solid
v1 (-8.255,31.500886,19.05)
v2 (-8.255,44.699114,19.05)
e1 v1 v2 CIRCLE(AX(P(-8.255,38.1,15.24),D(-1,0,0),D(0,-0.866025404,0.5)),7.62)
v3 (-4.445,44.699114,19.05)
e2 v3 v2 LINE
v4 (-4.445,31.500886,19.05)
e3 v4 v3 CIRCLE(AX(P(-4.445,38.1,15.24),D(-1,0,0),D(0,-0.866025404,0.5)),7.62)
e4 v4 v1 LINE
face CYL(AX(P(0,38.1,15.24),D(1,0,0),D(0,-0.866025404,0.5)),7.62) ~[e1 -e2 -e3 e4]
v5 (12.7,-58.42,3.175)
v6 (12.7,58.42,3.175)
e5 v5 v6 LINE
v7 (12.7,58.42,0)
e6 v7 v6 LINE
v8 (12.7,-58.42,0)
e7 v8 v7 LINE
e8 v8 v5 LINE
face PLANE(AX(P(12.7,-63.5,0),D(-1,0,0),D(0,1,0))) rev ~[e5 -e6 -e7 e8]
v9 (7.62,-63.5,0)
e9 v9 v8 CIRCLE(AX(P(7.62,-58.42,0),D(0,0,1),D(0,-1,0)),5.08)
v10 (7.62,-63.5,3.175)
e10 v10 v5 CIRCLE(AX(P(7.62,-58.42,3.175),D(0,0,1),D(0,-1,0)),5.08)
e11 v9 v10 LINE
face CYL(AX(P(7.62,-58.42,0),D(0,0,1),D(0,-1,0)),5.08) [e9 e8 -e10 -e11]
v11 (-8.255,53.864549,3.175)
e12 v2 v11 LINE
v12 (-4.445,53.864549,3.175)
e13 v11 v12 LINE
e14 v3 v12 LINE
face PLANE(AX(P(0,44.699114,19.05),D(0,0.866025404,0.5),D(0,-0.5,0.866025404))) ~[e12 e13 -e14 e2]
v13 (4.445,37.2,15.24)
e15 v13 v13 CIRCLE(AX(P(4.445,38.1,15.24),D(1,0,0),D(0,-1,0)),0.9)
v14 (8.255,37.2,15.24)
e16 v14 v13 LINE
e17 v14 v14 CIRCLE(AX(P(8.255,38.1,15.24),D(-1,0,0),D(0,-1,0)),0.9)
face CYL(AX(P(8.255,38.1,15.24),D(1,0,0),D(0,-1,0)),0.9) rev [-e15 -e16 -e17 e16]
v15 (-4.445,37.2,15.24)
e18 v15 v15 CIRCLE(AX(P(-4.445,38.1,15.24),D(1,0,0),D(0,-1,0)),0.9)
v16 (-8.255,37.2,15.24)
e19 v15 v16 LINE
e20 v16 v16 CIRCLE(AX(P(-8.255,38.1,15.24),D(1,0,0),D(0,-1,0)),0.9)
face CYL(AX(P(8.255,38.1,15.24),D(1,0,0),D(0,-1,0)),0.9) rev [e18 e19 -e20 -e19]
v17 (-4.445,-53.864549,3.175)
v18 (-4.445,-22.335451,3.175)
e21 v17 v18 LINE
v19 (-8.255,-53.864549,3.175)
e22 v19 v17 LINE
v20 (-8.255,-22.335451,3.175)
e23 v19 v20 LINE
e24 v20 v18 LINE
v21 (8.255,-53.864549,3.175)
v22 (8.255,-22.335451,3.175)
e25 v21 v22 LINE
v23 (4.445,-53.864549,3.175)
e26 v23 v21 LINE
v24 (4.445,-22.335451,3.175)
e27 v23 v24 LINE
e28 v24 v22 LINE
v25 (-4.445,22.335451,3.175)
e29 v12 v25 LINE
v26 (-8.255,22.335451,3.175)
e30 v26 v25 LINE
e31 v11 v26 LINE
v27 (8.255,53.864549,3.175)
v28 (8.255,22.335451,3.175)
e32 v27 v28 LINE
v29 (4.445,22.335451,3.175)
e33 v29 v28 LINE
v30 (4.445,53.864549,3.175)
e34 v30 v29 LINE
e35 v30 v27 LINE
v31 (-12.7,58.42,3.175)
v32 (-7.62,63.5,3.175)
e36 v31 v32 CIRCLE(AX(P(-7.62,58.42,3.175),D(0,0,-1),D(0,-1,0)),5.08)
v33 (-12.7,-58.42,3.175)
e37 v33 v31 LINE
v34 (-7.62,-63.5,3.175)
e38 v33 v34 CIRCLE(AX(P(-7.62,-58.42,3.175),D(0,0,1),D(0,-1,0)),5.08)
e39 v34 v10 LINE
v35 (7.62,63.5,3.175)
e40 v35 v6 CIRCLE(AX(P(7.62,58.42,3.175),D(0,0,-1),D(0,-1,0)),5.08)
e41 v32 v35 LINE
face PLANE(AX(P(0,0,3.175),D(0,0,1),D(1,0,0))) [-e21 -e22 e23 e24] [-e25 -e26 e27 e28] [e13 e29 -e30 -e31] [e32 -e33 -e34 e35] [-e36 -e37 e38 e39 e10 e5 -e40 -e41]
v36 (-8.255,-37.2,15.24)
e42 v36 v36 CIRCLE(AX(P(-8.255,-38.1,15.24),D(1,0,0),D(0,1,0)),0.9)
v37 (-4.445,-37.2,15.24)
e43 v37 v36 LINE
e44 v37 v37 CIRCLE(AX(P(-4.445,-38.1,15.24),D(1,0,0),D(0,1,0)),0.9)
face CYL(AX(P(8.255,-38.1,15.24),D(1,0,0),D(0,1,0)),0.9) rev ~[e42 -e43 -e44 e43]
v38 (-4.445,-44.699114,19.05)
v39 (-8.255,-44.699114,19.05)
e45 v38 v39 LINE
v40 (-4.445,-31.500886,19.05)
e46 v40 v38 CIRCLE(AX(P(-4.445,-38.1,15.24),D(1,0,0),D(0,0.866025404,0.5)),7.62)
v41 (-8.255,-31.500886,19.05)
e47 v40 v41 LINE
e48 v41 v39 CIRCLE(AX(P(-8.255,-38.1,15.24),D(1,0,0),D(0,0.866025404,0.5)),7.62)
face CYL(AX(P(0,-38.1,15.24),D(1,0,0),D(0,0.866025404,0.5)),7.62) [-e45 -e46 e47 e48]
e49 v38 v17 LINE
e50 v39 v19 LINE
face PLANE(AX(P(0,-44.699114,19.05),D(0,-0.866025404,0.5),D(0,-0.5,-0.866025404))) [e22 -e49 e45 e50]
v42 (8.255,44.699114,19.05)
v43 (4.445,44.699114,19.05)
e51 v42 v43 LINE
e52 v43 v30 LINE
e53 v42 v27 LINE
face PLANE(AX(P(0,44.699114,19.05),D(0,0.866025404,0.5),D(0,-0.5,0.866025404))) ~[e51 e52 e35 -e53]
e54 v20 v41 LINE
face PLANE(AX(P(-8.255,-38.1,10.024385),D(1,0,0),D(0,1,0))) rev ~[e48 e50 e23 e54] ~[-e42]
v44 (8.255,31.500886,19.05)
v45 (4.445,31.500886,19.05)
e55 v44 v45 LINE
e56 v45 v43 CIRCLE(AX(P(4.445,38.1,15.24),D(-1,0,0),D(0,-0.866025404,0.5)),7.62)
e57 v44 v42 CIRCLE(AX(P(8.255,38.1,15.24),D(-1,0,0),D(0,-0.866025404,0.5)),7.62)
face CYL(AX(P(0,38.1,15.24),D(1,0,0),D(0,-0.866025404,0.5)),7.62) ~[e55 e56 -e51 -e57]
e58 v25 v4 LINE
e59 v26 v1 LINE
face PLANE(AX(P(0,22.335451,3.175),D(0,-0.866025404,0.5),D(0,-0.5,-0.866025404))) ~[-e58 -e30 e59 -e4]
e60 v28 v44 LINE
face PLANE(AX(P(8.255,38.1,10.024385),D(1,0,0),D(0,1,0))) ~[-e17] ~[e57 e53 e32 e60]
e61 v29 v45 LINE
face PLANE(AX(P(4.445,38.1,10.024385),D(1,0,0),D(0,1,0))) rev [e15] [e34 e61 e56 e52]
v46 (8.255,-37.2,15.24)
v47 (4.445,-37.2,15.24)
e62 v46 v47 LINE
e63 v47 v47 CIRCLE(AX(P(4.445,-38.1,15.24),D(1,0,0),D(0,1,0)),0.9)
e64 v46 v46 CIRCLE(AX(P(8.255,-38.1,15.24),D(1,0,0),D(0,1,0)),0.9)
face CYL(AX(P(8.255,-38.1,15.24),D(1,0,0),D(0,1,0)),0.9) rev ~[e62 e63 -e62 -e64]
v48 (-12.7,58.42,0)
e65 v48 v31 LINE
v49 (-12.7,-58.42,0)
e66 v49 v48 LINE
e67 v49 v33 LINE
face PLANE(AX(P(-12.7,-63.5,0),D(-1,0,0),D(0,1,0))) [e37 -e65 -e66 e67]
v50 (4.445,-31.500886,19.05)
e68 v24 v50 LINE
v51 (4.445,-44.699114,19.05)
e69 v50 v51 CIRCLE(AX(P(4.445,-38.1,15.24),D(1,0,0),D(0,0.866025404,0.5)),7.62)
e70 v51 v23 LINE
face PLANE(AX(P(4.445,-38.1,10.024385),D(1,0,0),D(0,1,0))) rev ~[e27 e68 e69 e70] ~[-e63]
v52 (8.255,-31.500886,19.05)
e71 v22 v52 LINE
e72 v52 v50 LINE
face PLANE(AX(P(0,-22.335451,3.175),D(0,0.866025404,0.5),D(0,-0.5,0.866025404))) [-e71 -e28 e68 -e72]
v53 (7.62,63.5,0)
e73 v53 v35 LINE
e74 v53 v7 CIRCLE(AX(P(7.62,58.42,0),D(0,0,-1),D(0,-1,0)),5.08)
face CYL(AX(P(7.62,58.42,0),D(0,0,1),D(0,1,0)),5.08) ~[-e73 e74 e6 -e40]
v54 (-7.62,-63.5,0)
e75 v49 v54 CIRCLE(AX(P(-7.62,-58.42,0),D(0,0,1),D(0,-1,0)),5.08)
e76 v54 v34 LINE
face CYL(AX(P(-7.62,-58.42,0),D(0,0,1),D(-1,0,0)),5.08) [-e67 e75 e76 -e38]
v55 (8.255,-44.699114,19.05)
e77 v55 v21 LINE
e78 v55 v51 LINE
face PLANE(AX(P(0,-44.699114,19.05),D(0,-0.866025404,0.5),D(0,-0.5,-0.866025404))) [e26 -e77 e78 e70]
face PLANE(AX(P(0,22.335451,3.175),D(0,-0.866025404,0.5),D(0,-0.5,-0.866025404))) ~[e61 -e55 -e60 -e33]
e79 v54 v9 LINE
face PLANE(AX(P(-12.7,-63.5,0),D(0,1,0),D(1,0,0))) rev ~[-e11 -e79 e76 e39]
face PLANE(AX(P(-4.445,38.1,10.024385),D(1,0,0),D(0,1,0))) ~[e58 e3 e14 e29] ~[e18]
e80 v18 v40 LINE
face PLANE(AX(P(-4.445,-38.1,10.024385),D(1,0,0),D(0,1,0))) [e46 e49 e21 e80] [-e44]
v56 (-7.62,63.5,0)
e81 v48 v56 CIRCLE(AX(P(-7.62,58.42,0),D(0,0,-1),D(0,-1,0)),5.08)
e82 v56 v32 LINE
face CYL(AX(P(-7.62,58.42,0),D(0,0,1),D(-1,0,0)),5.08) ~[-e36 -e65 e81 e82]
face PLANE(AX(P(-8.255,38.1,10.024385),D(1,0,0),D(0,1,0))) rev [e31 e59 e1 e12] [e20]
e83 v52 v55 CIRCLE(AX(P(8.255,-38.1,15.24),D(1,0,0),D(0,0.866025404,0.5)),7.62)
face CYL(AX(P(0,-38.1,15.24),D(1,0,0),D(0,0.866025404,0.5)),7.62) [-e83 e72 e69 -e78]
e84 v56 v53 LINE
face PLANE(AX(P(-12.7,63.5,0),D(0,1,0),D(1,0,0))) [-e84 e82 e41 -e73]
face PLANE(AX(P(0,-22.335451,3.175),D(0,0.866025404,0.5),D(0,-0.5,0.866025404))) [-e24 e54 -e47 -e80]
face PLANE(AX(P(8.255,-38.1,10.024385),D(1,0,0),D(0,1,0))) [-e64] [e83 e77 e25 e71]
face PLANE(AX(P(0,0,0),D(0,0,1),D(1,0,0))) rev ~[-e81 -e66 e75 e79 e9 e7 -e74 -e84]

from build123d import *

# Parameters (mm, degrees)
F0_W     = 25.4
F0_H     = 127
F1_DEPTH = 3.175
F3_DEPTH = 8.255
F4_DEPTH = 4.445
F5_R     = 0.9
F6_DEPTH = 20.956
F7_R     = 5.08


# Not quite as in the source:
# - a pattern or mirror of a feature is missing from the dataset's text; its kind, count and spacing are read off the source's solid


with BuildPart() as f1:
    # F0 (on Top) → F1 (new body)
    with BuildSketch(Plane.XY):
        Rectangle(F0_W, F0_H)
    extrude(amount=F1_DEPTH)

    # F2 (on Right) → F3 (join, symmetric)
    with BuildSketch(Plane.YZ):
        with BuildLine():
            Line((-44.6991135768, 19.05), (-53.8645491002, 3.175))
            Line((-53.8645491002, 3.175), (-22.3354508998, 3.175))
            Line((-22.3354508998, 3.175), (-31.5008864232, 19.05))
            ThreePointArc((-31.5008864232, 19.05), (-38.1, 22.86), (-44.6991135768, 19.05))
        make_face()
    f3 = extrude(amount=F3_DEPTH, both=True)

    # F3_copies: F3 across plane
    add(f3.mirror(Plane.ZX))

    # F2 (on Right) → F4 (cut, symmetric)
    with BuildSketch(Plane.YZ):
        with BuildLine():
            Line((-44.6991135768, 19.05), (-53.8645491002, 3.175))
            Line((-53.8645491002, 3.175), (-22.3354508998, 3.175))
            Line((-22.3354508998, 3.175), (-31.5008864232, 19.05))
            ThreePointArc((-31.5008864232, 19.05), (-38.1, 22.86), (-44.6991135768, 19.05))
        make_face()
    f4 = extrude(amount=F4_DEPTH, both=True, mode=Mode.SUBTRACT)

    # F4_copies: F4 across plane
    add(f4.mirror(Plane.ZX), mode=Mode.SUBTRACT)

    # F5 (on face) → F6 (cut, through all)
    with BuildSketch(Plane.YZ.offset(8.255)):
        with Locations((-38.1, 15.24)):
            Circle(F5_R)
    f6 = extrude(amount=-F6_DEPTH, mode=Mode.SUBTRACT)

    # F6_copies: F6 across plane
    add(f6.mirror(Plane.ZX), mode=Mode.SUBTRACT)

    # F7
    f7_edges = [f1.edges().sort_by_distance(p)[0] for p in [
        (12.7, -63.5, 1.5875),
        (-12.7, -63.5, 1.5875),
        (12.7, 63.5, 1.5875),
        (-12.7, 63.5, 1.5875),
    ]]
    fillet(f7_edges, radius=F7_R)


solid = f1.part
